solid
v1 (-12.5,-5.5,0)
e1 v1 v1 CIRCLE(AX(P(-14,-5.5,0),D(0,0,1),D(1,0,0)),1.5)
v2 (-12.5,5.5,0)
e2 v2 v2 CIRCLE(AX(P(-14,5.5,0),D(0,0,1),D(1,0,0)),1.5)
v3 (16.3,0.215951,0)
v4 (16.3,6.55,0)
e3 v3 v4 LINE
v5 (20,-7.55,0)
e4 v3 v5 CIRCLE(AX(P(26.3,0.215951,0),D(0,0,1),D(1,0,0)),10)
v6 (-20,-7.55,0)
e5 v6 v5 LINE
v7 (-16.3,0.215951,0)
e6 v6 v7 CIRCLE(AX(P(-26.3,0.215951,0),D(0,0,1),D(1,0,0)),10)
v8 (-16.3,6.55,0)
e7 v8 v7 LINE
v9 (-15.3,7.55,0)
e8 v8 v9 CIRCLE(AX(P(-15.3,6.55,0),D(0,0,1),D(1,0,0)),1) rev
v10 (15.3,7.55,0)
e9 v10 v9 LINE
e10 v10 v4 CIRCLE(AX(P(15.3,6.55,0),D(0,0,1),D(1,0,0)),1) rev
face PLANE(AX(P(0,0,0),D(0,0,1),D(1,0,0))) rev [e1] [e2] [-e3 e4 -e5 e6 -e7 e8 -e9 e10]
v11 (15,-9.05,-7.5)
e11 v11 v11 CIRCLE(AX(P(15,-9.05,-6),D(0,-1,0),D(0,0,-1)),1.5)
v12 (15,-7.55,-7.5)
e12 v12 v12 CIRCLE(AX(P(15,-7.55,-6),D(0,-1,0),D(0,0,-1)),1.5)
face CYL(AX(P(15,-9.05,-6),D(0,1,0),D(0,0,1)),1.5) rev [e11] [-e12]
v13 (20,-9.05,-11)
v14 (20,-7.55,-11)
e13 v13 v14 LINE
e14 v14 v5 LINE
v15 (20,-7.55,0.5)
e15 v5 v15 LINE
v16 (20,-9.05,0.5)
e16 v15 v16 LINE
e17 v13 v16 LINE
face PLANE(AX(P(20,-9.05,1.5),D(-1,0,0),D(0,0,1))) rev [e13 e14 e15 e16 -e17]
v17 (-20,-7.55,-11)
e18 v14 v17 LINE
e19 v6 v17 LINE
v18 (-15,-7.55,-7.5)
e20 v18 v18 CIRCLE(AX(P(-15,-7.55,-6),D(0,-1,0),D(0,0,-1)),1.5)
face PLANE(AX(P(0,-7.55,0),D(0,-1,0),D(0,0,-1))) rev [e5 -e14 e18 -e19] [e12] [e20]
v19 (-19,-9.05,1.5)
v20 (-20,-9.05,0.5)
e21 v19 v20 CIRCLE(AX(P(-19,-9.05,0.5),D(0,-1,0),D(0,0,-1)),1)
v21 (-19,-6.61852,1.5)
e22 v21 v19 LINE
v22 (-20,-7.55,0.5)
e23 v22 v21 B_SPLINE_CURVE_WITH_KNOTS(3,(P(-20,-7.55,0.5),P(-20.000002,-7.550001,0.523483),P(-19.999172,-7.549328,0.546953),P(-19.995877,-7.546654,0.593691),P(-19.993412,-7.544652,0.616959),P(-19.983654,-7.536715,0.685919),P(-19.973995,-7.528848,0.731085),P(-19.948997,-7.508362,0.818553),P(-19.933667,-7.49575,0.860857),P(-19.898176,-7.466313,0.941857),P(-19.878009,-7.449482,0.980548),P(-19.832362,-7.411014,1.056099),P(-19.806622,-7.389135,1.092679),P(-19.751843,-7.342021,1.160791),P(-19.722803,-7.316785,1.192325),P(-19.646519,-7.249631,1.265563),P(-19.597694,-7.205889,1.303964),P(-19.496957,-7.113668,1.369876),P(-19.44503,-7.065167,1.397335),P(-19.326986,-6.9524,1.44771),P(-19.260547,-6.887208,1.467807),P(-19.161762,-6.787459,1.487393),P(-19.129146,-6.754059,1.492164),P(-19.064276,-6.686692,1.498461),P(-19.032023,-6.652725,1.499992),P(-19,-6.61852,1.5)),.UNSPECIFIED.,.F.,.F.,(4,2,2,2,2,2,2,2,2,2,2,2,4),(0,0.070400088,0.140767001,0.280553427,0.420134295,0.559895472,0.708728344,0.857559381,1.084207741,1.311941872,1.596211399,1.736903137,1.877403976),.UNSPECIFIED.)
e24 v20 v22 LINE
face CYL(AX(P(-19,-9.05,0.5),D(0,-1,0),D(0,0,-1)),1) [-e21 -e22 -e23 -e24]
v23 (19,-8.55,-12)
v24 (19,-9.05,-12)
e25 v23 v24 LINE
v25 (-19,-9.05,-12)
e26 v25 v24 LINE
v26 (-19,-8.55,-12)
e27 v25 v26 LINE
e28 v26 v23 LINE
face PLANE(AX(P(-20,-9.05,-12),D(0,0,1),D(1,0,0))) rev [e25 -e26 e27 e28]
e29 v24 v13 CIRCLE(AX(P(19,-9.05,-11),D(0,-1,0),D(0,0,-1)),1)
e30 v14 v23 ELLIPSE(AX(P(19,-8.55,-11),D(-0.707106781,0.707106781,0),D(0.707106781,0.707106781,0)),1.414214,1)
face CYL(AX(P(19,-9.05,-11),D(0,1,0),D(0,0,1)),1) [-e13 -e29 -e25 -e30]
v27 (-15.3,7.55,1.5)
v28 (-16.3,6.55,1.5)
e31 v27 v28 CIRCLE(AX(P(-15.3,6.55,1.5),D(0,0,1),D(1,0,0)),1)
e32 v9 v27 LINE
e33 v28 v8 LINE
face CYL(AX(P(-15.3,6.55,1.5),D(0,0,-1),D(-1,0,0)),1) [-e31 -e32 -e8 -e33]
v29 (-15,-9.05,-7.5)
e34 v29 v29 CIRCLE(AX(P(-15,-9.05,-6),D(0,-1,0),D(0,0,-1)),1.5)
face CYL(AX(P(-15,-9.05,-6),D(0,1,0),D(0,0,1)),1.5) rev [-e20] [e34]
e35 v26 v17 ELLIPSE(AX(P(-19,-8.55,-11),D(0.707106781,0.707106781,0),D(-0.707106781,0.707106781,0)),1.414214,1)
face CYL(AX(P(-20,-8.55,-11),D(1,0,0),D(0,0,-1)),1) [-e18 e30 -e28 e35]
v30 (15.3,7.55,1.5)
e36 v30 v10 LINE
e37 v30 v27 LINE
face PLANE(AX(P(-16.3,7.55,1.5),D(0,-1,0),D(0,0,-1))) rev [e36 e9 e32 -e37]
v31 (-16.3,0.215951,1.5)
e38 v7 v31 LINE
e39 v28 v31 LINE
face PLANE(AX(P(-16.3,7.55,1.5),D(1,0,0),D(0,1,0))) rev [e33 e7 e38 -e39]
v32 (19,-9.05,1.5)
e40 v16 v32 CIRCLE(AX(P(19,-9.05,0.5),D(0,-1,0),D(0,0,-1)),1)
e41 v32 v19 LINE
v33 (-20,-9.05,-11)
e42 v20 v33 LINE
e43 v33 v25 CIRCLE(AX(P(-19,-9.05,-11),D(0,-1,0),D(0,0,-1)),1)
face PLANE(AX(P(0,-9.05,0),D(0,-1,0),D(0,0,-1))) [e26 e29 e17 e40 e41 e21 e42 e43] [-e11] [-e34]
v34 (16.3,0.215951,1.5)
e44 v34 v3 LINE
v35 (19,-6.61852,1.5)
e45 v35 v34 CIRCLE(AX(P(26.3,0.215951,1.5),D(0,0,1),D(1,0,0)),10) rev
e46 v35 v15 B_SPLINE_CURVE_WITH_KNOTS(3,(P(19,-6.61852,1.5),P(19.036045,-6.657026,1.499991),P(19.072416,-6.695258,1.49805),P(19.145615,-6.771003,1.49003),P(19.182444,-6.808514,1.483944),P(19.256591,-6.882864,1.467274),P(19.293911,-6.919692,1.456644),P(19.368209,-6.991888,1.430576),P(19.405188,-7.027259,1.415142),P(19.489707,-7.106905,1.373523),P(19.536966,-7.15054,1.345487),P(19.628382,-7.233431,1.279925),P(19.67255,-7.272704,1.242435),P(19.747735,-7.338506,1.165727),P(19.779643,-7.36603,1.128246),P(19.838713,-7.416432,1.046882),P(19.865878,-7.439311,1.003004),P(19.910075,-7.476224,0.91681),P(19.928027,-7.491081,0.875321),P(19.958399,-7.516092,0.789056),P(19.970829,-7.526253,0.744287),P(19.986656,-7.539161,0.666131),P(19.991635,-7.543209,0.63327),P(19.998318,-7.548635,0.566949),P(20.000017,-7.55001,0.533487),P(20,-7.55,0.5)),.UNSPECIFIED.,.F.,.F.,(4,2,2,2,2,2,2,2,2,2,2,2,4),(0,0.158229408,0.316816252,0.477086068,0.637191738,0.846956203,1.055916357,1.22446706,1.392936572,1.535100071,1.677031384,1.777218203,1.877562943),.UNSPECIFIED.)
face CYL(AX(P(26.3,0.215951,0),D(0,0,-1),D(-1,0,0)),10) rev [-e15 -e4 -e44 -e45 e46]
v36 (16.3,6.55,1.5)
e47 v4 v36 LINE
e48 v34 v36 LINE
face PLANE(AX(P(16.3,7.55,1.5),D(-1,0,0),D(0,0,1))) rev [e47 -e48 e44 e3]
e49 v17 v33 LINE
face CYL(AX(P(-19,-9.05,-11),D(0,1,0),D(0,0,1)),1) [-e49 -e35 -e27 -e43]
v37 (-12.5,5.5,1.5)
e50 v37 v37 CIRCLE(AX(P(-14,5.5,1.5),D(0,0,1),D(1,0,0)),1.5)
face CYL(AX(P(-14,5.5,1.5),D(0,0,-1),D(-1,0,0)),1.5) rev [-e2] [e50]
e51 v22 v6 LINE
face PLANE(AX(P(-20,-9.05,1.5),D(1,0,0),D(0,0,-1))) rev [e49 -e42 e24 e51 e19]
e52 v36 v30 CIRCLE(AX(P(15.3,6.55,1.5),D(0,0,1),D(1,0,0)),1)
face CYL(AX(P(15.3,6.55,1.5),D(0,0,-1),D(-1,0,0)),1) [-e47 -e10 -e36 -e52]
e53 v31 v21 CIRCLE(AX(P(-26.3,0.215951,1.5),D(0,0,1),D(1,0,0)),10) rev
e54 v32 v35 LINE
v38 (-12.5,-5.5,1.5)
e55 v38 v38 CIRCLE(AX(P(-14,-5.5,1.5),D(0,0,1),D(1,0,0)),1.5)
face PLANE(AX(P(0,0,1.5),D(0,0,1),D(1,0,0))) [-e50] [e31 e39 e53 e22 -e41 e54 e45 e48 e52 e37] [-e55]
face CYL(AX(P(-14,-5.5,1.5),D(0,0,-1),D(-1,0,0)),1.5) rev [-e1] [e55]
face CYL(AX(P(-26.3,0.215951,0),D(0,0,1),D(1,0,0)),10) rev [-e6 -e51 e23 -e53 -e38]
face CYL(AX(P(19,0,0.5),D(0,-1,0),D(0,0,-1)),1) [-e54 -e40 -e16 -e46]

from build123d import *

# Parameters (mm, degrees)
SKETCH1_W           = 32.6
SKETCH1_H           = 15.1
SKETCH1_R           = 1.5
BOSS_EXTRUDE1_DEPTH = 1.5
SKETCH2_W           = 40
SKETCH2_H           = 13.5
SKETCH2_R           = 1.5
BOSS_EXTRUDE2_DEPTH = 1.5
FILLET1_R           = 10
FILLET2_R           = 1


with BuildPart() as part:
    # Sketch1 → Boss-Extrude1 (new body)
    with BuildSketch(Plane.XY):
        Rectangle(SKETCH1_W, SKETCH1_H)
        with Locations((-14, 5.5)):
            Circle(SKETCH1_R, mode=Mode.SUBTRACT)
        with Locations((-14, -5.5)):
            Circle(SKETCH1_R, mode=Mode.SUBTRACT)
    extrude(amount=BOSS_EXTRUDE1_DEPTH)

    # Sketch2 → Boss-Extrude2 (add)
    with BuildSketch(Plane.XZ.offset(7.55)):
        with Locations((0, -5.25)):
            Rectangle(SKETCH2_W, SKETCH2_H)
        with Locations(Location((-15, -6, 0), (0, 0, 270))):
            Circle(SKETCH2_R, mode=Mode.SUBTRACT)
        with Locations(Location((15, -6, 0), (0, 0, 270))):
            Circle(SKETCH2_R, mode=Mode.SUBTRACT)
    extrude(amount=BOSS_EXTRUDE2_DEPTH)

    # Fillet1
    # the kernel refuses this fillet: 10 mm, written as the material it adds along each edge
    with BuildSketch(Plane(origin=(16.3, -7.55, 0), x_dir=(1, 0, 0), z_dir=(0, 0, 1))) as fillet1_piece_1:
        with BuildLine():
            CenterArc((10, 7.765951326), FILLET1_R, 180, 50.949877464)
            Line((0, 7.765951326), (-0.2, 7.765951326))
            Line((-0.2, 7.765951326), (-0.2, 0))
            Line((-0.2, 0), (0, -0.2))
            ThreePointArc((0, -0.2), (1.85, -0.2), (3.574, -0.155319027))
            Line((3.574, -0.155319027), (3.7, 0))
        make_face()
    extrude(amount=1.5)
    with BuildSketch(Plane(origin=(-16.3, -7.55, 0), x_dir=(-1, 0, 0), z_dir=(0, 0, 1))) as fillet1_piece_2:
        with BuildLine():
            CenterArc((10, -7.765951326), FILLET1_R, 129.050122536, 50.949877464)
            Line((0, -7.765951326), (-0.2, -7.765951326))
            Line((-0.2, -7.765951326), (-0.2, 0))
            Line((-0.2, 0), (0, 0.2))
            ThreePointArc((0, 0.2), (1.85, 0.2), (3.574, 0.155319027))
            Line((3.574, 0.155319027), (3.7, 0))
        make_face()
    extrude(amount=1.5)

    # Fillet2
    fillet2_edges = [part.edges().sort_by_distance(p)[0] for p in [
        (-20, -8.3, 1.5),
        (0, -7.55, -12),
        (-20, -8.3, -12),
        (20, -8.3, -12),
        (20, -8.3, 1.5),
        (-16.3, 7.55, 0.75),
        (16.3, 7.55, 0.75),
    ]]
    fillet(fillet2_edges, radius=FILLET2_R)


solid = part.part
